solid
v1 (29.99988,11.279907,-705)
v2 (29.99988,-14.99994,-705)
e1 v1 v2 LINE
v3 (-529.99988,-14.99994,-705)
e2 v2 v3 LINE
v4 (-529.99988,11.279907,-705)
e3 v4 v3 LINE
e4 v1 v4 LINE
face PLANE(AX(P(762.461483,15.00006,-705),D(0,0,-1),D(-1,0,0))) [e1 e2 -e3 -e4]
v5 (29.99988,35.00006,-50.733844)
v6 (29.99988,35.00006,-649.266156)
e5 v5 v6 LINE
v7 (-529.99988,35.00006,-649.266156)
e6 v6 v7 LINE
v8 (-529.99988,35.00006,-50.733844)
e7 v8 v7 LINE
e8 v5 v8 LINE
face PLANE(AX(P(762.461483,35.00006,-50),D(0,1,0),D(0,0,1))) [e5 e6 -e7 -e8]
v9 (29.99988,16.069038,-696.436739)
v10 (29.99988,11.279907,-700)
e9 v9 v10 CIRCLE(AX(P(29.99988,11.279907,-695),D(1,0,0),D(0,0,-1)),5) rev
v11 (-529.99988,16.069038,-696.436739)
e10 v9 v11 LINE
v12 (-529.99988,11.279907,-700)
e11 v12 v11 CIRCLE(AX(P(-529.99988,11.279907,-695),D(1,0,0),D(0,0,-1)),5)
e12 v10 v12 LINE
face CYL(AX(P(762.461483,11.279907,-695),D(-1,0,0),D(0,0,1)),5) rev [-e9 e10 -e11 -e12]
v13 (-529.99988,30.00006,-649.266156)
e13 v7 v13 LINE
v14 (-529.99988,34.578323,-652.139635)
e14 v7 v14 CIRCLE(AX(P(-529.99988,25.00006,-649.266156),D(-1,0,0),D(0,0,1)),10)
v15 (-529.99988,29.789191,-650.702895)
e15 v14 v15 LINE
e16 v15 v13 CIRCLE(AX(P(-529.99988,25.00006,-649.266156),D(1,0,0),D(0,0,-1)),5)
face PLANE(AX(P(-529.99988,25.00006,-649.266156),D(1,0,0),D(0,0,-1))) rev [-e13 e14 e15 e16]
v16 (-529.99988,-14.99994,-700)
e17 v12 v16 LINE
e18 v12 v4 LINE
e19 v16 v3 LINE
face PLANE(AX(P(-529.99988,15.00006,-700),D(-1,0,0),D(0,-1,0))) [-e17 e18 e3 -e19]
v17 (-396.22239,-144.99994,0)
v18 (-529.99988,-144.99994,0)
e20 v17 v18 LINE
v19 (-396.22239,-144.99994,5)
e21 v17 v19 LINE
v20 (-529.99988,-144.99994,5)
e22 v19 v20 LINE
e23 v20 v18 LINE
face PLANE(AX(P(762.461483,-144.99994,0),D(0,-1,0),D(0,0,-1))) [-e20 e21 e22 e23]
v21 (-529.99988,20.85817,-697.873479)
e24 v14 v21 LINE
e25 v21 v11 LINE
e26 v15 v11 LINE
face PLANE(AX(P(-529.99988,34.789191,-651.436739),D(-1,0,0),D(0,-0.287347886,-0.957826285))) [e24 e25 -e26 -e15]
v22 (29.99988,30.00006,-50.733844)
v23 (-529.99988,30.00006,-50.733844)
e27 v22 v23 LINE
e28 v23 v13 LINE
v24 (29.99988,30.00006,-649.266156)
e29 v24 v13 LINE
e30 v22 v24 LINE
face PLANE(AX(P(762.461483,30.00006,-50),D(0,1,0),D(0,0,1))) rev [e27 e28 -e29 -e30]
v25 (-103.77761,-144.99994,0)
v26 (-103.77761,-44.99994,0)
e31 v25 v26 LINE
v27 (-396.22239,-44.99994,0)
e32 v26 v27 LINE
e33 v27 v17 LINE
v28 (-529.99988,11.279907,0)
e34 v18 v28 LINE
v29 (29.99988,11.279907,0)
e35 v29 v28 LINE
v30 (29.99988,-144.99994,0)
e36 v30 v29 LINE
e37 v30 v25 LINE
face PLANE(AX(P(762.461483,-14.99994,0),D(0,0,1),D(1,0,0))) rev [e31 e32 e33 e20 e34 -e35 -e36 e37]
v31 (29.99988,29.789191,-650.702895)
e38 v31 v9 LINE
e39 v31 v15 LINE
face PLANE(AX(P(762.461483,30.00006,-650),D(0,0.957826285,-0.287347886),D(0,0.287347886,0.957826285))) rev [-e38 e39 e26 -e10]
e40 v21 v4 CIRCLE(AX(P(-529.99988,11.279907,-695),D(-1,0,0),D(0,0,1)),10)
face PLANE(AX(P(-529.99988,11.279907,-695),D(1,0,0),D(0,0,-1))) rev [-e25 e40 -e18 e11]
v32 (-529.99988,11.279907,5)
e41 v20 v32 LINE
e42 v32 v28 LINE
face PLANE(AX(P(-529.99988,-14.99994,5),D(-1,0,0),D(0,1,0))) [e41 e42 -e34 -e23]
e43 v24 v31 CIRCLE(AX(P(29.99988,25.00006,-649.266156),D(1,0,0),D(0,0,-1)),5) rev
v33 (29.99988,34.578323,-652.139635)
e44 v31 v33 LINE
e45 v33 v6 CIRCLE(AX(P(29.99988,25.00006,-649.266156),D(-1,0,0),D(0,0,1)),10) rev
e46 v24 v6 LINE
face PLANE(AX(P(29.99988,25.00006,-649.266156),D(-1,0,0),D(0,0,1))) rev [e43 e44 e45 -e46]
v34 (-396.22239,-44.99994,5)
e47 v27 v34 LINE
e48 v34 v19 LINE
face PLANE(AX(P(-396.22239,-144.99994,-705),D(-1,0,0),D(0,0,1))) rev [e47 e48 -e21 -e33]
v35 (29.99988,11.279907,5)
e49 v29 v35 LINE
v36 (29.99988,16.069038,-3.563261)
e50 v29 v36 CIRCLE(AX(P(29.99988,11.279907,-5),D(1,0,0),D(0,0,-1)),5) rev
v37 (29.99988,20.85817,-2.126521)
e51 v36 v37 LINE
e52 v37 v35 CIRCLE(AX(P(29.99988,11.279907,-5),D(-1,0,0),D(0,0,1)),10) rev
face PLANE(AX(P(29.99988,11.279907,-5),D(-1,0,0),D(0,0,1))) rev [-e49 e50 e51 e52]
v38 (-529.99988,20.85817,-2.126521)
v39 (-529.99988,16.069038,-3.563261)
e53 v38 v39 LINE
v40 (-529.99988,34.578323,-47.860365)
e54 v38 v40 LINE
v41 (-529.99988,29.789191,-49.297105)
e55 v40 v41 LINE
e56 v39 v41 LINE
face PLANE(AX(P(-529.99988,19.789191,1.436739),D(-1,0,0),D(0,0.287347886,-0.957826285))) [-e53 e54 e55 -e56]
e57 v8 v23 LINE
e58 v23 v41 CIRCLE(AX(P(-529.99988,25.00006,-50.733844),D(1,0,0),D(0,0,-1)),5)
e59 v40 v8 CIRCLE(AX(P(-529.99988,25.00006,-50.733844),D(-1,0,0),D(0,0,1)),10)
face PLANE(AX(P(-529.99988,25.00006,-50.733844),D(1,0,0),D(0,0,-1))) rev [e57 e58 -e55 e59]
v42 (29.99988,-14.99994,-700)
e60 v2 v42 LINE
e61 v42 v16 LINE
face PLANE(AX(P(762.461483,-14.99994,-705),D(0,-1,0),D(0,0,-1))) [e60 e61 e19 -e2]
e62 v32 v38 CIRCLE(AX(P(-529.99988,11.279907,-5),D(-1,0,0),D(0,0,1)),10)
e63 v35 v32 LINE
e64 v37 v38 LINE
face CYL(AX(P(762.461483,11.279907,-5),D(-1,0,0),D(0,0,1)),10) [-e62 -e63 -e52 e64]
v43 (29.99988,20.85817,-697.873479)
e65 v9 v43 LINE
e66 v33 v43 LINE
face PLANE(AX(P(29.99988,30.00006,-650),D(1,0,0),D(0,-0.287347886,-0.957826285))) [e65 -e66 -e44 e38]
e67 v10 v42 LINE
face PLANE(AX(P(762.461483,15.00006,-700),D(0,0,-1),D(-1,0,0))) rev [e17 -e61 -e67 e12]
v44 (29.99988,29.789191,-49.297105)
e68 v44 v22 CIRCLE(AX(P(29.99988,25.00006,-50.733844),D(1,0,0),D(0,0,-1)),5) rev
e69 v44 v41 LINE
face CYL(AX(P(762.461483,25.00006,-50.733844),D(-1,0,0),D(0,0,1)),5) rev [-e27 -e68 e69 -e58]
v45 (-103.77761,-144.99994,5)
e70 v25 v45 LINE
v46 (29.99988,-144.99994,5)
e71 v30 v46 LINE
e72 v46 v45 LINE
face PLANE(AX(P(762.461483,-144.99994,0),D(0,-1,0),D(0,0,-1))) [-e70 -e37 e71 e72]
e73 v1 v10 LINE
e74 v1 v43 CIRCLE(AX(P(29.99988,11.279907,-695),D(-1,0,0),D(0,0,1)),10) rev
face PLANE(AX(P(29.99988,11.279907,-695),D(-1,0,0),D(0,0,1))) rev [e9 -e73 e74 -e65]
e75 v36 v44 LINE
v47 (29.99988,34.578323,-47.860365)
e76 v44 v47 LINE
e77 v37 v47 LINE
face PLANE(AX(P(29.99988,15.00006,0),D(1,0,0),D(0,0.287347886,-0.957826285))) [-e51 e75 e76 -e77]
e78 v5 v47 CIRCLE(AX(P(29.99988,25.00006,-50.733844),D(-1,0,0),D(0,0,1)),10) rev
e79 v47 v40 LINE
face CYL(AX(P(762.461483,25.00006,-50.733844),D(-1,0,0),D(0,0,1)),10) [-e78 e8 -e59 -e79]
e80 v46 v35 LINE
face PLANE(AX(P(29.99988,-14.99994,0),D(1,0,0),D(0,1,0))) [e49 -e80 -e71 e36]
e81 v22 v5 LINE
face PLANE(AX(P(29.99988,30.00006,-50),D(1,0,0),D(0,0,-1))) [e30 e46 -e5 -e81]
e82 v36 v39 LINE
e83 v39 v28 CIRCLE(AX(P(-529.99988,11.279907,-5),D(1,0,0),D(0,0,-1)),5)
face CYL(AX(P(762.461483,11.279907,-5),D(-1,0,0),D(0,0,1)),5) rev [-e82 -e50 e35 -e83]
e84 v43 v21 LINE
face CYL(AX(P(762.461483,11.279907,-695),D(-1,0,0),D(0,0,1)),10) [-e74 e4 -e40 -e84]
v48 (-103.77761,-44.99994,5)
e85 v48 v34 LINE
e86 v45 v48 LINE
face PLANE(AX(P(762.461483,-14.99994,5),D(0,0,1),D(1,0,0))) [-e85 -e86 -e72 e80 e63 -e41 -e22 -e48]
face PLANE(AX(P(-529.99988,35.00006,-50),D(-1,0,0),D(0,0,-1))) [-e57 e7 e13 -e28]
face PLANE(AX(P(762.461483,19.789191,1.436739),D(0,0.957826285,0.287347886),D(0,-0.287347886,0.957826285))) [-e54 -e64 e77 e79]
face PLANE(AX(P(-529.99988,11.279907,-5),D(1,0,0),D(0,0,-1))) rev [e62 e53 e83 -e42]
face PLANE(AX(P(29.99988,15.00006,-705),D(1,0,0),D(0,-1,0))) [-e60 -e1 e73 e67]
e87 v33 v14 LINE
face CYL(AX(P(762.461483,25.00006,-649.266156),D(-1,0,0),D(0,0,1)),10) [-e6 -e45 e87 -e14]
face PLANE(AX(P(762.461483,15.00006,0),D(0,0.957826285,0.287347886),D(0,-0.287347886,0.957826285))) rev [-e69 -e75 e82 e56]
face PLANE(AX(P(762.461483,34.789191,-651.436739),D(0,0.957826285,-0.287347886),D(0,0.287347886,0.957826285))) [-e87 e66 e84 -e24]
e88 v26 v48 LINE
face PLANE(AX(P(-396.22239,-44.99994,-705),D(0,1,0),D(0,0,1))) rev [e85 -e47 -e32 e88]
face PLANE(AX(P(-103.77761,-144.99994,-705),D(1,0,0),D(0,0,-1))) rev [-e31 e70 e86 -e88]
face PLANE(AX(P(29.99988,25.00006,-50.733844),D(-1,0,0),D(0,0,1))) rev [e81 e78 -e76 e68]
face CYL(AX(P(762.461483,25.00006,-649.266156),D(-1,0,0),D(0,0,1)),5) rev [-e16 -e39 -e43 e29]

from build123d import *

# Parameters (mm, degrees)
BASE_FLANGE1_START = -279.99988
BASE_FLANGE1_DEPTH = 559.99976
SKETCH8_W          = 292.444779068
SKETCH8_H          = 100
CUT_EXTRUDE1_DEPTH = 898.788870169


# Sheet-metal steps are written as plain solids
with BuildPart() as part:
    # Sketch3 → Base-Flange1 (new body)
    with BuildSketch(Plane(origin=(-250, -934.739885498, -1517.780517475), x_dir=(0, 0, -1), z_dir=(1, 0, 0)).offset(BASE_FLANGE1_START)):
        with BuildLine():
            Line((-1517.780517475, 789.739945498), (-1517.780517475, 919.739945498))
            Line((-1517.780517475, 919.739945498), (-1517.780517475, 946.019792244))
            ThreePointArc((-1517.780517475, 946.019792244), (-1516.791982116, 949.004444892), (-1514.217256902, 950.80892367))
            Line((-1514.217256902, 950.80892367), (-1468.483412721, 964.529076924))
            ThreePointArc((-1468.483412721, 964.529076924), (-1467.772739017, 964.686947476), (-1467.046673293, 964.739945498))
            Line((-1467.046673293, 964.739945498), (-868.514361656, 964.739945498))
            ThreePointArc((-868.514361656, 964.739945498), (-867.788295933, 964.686947476), (-867.077622228, 964.529076924))
            Line((-867.077622228, 964.529076924), (-821.343778047, 950.80892367))
            ThreePointArc((-821.343778047, 950.80892367), (-818.769052833, 949.004444892), (-817.780517475, 946.019792244))
            Line((-817.780517475, 946.019792244), (-817.780517475, 919.739945498))
            Line((-817.780517475, 919.739945498), (-812.780517475, 919.739945498))
            Line((-812.780517475, 919.739945498), (-812.780517475, 946.019792244))
            ThreePointArc((-812.780517475, 946.019792244), (-814.757588192, 951.98909754), (-819.907038619, 955.598055096))
            Line((-819.907038619, 955.598055096), (-865.6408828, 969.318208351))
            ThreePointArc((-865.6408828, 969.31820835), (-867.062230209, 969.633949453), (-868.514361657, 969.739945498))
            Line((-868.514361656, 969.739945498), (-1467.046673293, 969.739945498))
            ThreePointArc((-1467.046673294, 969.739945498), (-1468.49880474, 969.633949453), (-1469.920152148, 969.318208351))
            Line((-1469.920152149, 969.318208351), (-1515.65399633, 955.598055096))
            ThreePointArc((-1515.65399633, 955.598055096), (-1520.803446757, 951.98909754), (-1522.780517475, 946.019792244))
            Line((-1522.780517475, 946.019792244), (-1522.780517475, 919.739945498))
            Line((-1522.780517475, 919.739945498), (-1522.780517475, 789.739945498))
            Line((-1522.780517475, 789.739945498), (-1517.780517475, 789.739945498))
        make_face()
    extrude(amount=BASE_FLANGE1_DEPTH)

    # Sketch8 → Cut-Extrude1 (cut, through all)
    with BuildSketch(Plane.XY.offset(5)):
        with Locations((-250, -94.99994)):
            Rectangle(SKETCH8_W, SKETCH8_H)
    extrude(amount=-CUT_EXTRUDE1_DEPTH, mode=Mode.SUBTRACT)


solid = part.part
